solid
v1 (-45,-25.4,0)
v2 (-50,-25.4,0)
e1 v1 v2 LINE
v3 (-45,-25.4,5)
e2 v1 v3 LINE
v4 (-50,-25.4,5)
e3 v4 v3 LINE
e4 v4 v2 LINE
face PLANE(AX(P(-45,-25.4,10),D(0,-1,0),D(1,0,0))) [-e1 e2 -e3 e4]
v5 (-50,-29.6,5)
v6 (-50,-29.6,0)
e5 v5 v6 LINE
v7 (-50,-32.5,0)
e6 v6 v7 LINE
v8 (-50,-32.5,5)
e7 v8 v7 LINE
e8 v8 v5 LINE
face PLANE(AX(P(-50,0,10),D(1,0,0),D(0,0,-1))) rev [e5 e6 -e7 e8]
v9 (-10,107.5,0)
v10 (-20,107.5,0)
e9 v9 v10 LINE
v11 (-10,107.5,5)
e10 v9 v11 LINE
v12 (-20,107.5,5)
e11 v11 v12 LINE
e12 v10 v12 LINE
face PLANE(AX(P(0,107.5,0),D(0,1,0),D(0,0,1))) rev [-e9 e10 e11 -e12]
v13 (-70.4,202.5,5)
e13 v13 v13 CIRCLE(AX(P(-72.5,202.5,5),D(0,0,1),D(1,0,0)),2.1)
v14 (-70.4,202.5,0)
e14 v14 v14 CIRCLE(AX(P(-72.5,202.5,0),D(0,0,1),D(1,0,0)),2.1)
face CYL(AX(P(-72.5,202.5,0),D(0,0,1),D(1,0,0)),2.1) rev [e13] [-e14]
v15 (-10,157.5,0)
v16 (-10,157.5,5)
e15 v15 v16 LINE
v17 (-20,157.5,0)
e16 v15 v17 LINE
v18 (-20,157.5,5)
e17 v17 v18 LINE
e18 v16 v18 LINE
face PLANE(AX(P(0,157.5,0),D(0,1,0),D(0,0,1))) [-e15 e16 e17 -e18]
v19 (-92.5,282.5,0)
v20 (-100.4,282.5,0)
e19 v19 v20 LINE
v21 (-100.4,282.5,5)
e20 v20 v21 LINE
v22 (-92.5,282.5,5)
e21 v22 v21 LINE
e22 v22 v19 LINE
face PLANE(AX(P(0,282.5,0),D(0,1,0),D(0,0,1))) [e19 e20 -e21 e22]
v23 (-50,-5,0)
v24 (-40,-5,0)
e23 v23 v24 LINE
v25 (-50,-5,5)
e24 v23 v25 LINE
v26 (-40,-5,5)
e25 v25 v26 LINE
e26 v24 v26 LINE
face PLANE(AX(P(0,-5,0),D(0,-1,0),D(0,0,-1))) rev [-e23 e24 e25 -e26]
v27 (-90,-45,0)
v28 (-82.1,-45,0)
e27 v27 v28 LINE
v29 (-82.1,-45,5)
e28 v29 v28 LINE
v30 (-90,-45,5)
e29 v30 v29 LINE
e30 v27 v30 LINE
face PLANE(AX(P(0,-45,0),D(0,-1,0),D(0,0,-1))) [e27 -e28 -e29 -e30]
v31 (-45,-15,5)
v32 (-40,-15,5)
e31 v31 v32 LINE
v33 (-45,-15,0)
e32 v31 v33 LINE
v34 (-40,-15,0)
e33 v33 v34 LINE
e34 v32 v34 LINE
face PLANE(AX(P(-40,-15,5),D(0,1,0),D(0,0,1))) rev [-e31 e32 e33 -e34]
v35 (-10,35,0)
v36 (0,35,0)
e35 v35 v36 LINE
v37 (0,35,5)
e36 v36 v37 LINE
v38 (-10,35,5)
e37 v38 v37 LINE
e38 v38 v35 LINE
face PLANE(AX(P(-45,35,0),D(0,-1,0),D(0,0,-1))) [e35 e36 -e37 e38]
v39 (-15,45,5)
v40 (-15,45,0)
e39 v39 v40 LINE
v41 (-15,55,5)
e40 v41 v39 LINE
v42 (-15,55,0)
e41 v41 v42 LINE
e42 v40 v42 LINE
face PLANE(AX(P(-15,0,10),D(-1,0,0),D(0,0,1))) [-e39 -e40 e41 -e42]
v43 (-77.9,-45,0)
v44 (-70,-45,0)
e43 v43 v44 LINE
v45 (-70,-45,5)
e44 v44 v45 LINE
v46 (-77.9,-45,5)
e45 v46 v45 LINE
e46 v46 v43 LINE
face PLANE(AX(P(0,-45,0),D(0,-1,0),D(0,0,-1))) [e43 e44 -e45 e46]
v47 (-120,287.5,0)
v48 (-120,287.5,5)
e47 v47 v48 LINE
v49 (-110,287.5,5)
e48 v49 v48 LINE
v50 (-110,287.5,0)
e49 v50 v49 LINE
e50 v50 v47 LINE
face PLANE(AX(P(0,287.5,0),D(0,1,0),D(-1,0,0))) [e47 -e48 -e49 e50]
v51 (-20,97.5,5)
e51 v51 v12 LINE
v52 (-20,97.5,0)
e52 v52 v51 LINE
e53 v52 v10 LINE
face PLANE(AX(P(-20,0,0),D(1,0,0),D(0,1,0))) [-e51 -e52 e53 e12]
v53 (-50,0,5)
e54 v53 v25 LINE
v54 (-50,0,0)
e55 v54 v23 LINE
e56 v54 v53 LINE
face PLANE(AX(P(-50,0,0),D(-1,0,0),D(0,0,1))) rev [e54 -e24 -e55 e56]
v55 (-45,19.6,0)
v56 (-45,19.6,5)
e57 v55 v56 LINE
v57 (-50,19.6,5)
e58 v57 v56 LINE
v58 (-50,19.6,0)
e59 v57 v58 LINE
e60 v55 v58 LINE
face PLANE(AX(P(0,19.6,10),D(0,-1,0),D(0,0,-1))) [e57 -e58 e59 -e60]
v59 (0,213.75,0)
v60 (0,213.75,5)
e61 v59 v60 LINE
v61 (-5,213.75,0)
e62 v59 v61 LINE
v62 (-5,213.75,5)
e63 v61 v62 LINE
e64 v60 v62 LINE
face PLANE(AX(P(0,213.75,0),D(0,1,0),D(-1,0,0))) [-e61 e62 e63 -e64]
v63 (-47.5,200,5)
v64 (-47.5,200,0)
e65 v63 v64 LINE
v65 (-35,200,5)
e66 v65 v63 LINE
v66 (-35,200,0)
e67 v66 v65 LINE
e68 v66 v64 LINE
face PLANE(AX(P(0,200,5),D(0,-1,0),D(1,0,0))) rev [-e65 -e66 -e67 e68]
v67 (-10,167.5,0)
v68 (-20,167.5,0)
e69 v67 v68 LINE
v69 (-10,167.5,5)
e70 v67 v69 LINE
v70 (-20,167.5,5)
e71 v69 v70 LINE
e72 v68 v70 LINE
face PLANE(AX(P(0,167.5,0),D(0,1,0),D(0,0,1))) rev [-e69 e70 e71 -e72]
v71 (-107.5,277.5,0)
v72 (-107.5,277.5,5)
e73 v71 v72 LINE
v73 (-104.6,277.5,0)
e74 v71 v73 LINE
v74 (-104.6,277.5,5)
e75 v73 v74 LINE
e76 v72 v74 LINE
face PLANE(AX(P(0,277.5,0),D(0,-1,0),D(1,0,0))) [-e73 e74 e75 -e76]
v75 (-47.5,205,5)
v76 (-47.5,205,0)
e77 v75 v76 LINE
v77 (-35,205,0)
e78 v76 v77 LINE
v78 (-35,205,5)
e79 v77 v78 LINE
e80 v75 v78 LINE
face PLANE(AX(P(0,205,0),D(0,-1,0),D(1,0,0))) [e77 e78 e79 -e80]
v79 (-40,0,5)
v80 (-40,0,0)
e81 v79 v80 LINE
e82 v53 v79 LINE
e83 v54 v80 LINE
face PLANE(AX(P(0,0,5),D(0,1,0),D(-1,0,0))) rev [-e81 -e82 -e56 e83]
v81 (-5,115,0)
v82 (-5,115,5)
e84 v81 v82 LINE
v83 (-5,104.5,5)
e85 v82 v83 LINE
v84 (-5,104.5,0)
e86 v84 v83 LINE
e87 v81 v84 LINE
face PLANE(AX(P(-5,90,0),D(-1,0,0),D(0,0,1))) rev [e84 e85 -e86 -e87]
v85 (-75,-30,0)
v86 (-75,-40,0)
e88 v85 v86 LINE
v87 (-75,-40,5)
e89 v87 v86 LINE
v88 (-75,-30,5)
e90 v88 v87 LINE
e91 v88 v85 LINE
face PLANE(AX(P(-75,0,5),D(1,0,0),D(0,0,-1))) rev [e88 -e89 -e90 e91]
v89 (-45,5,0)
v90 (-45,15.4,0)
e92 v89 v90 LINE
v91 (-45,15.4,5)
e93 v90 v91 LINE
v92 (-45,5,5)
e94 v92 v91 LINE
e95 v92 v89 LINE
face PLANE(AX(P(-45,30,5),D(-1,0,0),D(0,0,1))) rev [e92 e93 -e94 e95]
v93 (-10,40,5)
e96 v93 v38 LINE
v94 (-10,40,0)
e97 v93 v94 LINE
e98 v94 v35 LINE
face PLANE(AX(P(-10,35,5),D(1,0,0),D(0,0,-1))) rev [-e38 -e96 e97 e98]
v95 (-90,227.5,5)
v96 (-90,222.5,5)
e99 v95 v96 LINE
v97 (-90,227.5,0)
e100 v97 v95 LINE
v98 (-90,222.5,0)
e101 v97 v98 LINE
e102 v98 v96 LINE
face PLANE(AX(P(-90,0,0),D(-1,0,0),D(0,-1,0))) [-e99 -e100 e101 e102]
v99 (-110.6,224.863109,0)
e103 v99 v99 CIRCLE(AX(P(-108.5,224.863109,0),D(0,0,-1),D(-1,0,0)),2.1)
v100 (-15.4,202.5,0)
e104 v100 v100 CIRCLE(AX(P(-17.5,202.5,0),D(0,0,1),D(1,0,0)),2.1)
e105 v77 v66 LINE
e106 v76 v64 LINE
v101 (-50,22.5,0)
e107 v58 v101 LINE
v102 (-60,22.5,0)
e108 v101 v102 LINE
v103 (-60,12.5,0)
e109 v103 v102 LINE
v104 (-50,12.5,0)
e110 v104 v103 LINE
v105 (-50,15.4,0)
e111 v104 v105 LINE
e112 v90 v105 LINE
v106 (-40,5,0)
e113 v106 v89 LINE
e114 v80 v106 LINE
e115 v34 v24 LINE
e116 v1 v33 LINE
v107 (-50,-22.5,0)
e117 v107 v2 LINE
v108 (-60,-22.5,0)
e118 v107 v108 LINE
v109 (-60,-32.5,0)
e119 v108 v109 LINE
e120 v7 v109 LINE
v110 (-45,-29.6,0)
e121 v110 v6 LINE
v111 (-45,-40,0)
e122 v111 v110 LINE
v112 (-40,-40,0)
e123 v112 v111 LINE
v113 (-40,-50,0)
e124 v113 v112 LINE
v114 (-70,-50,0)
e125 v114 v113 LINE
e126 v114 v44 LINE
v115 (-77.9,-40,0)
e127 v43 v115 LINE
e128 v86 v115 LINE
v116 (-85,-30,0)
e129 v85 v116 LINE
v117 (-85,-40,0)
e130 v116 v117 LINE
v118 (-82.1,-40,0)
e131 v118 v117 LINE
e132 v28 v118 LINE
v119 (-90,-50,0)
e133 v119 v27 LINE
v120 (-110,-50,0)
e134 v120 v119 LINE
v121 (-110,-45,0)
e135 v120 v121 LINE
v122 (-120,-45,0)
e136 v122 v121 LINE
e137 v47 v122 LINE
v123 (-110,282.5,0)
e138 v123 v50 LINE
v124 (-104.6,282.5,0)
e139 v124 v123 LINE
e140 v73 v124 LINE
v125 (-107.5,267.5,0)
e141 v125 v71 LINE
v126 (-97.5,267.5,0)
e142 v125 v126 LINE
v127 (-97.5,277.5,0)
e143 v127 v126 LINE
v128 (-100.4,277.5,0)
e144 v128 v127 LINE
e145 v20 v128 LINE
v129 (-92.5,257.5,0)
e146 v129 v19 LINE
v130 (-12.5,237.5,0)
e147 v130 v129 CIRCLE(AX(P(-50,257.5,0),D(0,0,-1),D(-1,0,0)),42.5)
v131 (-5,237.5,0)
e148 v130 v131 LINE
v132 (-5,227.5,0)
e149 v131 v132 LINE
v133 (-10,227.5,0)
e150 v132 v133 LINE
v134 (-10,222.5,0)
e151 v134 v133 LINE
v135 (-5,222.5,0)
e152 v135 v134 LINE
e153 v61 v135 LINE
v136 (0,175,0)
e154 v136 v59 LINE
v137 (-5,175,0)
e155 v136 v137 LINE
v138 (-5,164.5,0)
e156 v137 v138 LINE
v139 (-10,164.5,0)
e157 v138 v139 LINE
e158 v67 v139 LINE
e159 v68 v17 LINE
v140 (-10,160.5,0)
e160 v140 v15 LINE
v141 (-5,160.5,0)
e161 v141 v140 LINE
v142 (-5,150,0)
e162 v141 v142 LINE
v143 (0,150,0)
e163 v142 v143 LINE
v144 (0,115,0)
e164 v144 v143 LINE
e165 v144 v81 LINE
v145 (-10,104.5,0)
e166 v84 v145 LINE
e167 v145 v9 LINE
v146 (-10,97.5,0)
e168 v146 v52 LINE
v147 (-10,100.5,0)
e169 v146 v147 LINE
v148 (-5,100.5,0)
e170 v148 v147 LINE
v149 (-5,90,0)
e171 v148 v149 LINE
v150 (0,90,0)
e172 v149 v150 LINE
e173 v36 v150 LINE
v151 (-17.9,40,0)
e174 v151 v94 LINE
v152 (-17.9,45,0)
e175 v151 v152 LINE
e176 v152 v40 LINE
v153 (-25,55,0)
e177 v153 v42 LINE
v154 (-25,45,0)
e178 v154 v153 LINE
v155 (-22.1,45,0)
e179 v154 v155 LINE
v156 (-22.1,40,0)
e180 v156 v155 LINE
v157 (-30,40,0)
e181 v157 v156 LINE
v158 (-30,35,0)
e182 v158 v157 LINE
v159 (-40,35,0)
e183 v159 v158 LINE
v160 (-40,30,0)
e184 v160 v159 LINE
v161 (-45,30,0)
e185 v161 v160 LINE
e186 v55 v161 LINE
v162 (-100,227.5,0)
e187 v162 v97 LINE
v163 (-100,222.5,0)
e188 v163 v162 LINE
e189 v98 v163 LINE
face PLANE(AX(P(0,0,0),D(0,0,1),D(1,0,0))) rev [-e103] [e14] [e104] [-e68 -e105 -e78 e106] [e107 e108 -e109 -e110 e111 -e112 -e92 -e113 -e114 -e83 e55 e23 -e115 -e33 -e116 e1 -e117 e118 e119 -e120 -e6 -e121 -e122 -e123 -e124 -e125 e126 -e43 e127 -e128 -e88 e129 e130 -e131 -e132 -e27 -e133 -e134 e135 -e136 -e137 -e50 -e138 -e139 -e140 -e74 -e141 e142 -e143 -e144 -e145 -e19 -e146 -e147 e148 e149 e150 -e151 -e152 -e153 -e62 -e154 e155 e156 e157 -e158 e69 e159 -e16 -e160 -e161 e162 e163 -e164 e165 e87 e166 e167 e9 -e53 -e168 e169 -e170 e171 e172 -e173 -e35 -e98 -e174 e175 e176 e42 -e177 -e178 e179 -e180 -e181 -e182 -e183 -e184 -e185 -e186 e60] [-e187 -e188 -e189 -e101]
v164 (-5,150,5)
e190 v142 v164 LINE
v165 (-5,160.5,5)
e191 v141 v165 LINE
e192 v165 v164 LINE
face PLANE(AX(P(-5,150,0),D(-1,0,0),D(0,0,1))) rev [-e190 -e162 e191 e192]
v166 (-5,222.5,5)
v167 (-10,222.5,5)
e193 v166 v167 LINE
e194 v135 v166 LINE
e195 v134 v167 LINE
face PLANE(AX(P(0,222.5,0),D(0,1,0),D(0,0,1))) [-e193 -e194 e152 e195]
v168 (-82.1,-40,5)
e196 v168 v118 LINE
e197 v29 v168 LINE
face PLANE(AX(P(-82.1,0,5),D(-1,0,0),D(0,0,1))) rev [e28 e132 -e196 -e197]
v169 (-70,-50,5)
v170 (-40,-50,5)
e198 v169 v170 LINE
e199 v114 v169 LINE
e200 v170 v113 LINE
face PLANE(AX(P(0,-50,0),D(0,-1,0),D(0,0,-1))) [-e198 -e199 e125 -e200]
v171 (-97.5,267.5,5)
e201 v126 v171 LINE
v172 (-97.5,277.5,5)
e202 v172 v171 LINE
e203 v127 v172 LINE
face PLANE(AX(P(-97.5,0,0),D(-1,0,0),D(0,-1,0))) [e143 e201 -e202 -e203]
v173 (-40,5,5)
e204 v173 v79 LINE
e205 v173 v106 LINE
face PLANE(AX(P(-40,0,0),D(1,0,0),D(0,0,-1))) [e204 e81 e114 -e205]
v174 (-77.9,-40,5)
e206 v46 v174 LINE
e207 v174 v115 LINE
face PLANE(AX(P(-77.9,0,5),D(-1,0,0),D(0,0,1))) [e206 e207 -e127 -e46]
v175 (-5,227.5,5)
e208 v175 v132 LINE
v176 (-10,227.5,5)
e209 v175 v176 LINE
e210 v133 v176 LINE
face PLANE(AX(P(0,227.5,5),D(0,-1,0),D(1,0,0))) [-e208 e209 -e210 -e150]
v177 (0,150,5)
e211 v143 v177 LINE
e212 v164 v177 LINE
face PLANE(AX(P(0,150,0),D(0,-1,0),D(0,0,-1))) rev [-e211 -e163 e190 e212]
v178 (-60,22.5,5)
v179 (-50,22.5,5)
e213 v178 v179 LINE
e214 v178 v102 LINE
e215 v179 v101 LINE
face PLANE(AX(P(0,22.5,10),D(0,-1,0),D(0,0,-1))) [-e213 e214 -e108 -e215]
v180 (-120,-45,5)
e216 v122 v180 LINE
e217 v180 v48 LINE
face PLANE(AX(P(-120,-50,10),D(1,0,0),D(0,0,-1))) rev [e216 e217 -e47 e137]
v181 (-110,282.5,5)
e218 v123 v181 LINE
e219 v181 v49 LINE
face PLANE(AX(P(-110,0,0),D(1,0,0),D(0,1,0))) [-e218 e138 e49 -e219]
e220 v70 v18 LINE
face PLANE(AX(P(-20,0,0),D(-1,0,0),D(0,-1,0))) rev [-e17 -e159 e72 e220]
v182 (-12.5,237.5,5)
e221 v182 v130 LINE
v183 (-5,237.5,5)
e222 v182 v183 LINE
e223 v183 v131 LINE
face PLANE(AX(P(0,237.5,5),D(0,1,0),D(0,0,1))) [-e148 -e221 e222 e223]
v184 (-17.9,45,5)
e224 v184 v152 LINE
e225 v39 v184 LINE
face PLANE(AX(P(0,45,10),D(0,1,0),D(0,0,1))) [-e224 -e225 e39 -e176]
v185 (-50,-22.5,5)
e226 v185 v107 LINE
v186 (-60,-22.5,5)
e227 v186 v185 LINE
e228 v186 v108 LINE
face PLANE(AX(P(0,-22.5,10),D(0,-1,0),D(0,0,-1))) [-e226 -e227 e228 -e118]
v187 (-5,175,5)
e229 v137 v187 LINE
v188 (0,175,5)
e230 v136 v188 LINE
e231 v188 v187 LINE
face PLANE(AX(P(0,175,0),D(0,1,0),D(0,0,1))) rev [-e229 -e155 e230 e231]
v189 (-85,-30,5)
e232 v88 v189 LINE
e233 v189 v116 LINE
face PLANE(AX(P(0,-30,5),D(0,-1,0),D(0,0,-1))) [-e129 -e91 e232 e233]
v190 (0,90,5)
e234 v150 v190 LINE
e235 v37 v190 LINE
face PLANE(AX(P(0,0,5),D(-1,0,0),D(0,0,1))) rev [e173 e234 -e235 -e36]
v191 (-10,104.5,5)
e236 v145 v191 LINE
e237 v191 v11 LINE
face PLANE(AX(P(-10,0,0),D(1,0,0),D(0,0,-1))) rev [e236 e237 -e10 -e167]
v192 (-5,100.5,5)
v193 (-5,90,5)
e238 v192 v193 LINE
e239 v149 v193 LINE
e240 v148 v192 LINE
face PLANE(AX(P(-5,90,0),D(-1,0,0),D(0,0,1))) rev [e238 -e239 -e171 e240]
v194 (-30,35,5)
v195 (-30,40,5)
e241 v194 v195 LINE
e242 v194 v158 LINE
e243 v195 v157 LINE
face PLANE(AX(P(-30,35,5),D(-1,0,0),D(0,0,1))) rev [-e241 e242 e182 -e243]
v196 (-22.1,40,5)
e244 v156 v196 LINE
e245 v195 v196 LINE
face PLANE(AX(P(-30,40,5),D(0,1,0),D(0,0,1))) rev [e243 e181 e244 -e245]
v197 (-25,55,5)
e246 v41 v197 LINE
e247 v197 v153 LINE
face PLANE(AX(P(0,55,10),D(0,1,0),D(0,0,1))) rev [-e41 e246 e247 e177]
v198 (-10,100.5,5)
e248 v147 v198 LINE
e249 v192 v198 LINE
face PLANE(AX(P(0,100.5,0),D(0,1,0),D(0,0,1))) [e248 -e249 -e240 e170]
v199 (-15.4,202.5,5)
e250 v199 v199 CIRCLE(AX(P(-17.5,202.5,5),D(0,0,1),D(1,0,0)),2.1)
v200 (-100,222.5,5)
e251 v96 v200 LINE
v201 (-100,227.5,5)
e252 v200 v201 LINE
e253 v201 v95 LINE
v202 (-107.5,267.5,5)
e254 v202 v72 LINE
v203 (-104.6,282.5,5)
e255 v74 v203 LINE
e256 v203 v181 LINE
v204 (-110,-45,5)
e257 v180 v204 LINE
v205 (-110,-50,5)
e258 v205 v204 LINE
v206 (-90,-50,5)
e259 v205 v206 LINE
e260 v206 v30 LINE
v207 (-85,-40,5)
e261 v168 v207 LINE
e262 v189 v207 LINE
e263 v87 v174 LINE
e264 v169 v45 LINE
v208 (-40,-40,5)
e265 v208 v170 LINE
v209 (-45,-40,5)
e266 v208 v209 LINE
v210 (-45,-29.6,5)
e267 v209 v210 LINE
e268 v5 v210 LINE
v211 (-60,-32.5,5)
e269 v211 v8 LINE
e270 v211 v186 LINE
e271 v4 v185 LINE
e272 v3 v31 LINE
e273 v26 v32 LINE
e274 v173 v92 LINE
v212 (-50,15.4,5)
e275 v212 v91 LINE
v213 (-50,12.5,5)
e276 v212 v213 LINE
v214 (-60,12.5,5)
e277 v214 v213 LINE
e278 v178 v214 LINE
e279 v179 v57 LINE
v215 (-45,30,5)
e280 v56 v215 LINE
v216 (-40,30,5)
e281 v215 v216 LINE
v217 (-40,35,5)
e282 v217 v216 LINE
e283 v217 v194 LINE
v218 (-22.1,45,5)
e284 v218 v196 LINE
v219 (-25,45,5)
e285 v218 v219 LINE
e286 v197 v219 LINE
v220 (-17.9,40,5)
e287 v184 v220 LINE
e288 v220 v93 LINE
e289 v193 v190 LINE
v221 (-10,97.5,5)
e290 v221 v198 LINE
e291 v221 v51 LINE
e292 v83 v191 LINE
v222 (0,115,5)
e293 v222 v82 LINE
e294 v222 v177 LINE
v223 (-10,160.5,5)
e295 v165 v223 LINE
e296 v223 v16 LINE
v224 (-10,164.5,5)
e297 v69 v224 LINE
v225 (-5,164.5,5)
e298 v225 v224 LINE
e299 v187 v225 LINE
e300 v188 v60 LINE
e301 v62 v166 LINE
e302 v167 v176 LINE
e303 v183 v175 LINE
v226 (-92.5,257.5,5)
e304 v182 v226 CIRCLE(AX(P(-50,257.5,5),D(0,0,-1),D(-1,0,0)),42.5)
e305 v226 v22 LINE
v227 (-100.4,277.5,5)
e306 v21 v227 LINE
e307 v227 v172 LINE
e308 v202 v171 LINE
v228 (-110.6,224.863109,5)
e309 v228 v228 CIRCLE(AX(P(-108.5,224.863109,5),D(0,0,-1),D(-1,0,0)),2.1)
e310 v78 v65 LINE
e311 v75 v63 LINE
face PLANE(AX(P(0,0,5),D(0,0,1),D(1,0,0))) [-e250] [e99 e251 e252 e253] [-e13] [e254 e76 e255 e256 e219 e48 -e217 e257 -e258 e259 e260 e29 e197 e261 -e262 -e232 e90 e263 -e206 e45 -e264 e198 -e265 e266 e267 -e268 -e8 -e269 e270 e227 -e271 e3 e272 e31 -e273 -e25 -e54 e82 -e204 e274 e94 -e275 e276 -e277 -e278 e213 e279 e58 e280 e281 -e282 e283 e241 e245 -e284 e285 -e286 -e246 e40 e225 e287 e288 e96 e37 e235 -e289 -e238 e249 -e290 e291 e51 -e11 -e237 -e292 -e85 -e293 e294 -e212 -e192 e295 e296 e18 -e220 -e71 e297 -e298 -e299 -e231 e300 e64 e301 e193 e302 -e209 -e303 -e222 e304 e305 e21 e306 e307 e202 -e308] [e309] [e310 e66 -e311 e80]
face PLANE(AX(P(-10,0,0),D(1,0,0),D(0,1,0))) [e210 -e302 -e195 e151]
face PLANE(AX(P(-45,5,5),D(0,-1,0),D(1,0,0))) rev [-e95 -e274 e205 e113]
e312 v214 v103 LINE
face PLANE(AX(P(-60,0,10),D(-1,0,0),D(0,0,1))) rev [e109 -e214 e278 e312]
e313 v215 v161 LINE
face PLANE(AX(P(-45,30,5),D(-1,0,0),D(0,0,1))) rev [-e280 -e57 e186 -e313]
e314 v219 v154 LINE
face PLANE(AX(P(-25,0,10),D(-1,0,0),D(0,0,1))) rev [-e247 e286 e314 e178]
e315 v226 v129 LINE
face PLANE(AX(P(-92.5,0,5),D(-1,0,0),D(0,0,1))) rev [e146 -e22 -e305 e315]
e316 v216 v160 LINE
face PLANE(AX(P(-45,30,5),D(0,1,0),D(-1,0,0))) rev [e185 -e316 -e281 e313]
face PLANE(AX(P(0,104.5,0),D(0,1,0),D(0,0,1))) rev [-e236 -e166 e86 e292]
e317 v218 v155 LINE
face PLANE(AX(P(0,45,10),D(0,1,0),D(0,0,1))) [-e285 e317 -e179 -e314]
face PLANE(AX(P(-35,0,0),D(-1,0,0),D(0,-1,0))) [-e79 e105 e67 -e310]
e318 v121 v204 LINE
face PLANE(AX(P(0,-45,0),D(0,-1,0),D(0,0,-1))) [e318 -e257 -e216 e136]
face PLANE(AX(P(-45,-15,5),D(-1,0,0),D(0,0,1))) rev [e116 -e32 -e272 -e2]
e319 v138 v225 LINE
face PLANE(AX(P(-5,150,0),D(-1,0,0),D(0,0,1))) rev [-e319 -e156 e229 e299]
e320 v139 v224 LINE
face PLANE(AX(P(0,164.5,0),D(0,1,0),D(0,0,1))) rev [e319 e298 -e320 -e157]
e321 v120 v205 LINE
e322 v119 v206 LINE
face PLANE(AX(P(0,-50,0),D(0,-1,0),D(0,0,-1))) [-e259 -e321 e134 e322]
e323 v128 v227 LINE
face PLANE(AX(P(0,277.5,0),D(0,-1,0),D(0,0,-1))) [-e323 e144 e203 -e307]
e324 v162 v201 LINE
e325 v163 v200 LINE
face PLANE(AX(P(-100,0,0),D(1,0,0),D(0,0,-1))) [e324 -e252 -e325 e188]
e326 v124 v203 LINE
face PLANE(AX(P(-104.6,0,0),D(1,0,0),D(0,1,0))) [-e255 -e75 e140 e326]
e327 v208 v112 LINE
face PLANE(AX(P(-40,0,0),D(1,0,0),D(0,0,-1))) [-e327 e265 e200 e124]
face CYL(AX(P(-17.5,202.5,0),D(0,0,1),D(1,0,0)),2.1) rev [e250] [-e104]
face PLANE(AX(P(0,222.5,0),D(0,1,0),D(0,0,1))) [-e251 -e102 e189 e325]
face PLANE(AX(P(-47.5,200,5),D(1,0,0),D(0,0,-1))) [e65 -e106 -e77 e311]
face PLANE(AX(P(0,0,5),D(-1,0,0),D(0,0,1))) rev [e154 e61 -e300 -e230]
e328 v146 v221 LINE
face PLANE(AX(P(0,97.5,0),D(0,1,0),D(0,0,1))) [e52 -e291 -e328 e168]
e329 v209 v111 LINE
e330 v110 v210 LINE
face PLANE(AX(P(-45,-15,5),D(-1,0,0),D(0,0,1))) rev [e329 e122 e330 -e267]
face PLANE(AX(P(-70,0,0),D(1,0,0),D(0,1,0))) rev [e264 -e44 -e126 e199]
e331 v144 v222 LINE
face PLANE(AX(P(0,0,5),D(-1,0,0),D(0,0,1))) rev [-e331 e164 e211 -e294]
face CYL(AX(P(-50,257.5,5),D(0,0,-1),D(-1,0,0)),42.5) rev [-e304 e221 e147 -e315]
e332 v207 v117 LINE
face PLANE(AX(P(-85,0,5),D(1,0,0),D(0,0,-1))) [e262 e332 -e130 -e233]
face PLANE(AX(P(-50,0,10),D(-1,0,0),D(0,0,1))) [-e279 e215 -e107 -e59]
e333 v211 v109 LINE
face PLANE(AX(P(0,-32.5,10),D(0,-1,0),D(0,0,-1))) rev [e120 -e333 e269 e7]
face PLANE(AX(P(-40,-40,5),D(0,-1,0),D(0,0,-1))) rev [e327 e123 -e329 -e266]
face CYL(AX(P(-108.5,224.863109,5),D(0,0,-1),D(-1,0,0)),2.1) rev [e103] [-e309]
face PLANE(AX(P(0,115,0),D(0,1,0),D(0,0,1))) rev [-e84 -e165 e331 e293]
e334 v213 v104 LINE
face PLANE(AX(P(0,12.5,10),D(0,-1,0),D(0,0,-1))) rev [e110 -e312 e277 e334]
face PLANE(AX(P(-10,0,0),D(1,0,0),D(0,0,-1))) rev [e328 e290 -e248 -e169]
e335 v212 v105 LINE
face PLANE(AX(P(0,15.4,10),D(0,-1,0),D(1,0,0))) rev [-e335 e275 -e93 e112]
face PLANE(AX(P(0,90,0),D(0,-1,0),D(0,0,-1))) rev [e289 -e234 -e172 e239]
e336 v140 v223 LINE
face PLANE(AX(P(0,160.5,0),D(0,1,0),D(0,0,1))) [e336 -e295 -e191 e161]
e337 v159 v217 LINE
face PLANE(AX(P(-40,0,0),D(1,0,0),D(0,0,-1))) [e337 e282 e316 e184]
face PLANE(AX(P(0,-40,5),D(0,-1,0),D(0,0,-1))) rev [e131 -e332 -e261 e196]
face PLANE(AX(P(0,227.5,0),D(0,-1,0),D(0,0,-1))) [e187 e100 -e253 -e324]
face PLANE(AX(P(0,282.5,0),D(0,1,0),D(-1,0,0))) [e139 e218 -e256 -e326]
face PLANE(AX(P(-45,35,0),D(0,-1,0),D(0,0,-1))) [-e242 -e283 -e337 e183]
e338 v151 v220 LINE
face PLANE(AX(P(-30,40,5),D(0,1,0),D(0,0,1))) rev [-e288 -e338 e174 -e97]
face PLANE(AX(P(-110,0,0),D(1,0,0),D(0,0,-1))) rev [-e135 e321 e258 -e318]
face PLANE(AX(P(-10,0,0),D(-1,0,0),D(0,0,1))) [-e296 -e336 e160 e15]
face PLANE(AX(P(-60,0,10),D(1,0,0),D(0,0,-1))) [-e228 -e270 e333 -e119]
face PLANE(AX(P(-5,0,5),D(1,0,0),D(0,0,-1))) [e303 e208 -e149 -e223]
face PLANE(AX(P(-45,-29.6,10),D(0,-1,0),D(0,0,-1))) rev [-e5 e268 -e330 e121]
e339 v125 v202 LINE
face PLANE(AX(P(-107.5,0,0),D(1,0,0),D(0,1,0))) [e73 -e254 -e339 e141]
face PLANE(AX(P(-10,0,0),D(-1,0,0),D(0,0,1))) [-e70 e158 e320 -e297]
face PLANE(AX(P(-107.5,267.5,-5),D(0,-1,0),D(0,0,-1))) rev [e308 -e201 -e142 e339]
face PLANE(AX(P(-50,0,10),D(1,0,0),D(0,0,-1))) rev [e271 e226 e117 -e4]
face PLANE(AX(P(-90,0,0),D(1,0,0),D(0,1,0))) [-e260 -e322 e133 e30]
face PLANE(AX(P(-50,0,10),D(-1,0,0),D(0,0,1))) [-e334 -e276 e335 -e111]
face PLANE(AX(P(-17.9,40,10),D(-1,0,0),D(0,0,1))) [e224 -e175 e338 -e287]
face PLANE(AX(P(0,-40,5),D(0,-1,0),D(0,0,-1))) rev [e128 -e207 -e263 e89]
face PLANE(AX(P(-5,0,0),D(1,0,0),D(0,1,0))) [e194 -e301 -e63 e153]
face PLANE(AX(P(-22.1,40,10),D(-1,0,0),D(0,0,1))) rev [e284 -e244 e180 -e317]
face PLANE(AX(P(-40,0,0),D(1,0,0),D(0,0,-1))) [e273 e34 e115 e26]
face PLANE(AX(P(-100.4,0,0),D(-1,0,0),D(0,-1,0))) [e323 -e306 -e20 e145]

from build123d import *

# Parameters (mm, degrees)
SKETCH1_W               = 150
SKETCH1_H               = 200
BOSS_EXTRUDE1_DEPTH     = 5
SKETCH2_W               = 45
SKETCH2_H               = 50
CUT_EXTRUDE1_DEPTH      = 10
SKETCH3_W               = 35
SKETCH3_H               = 5
BOSS_EXTRUDE2_DEPTH     = 5
SKETCH5_W               = 5
SKETCH5_H               = 45
BOSS_EXTRUDE3_DEPTH     = 5
SKETCH6_W               = 45
SKETCH6_H               = 15
BOSS_EXTRUDE4_DEPTH     = 5
SKETCH7_W               = 5
SKETCH7_H               = 25
SKETCH7_H_2             = 50
BOSS_EXTRUDE5_DEPTH     = 5
SKETCH8_W               = 35
SKETCH8_H               = 250
CUT_EXTRUDE3_DEPTH      = 10
SKETCH9_R               = 2.1
CUT_EXTRUDE4_DEPTH      = 5
BOSS_EXTRUDE6_DEPTH     = 5
CUT_EXTRUDE5_DEPTH      = 5
SKETCH12_W              = 4.2
SKETCH12_H              = 5
CUT_EXTRUDE6_DEPTH      = 5
SKETCH13_W              = 5
SKETCH13_H              = 35
SKETCH13_H_2            = 45
BOSS_EXTRUDE7_DEPTH     = 5
SKETCH14_W              = 5
SKETCH14_H              = 25
CUT_EXTRUDE7_DEPTH      = 5
SKETCH15_W              = 20
SKETCH15_H              = 5
CUT_EXTRUDE8_DEPTH      = 5
SKETCH16_W              = 5
SKETCH16_H              = 25
CUT_EXTRUDE9_DEPTH      = 5
BOSS_EXTRUDE8_START     = -5
BOSS_EXTRUDE8_OUTLINE_R = 2.1
BOSS_EXTRUDE8_OUTLINE_W = 10
BOSS_EXTRUDE8_OUTLINE_H = 5
BOSS_EXTRUDE8_DEPTH     = 5
SKETCH18_W              = 10
SKETCH18_H              = 10
SKETCH18_W_2            = 5
SKETCH18_H_2            = 4
CUT_EXTRUDE10_DEPTH     = 5
CUT_EXTRUDE11_DEPTH     = 10
SKETCH20_W              = 10
SKETCH20_H              = 1.8
CUT_EXTRUDE13_DEPTH     = 10
SKETCH21_R              = 42.5
SKETCH21_R_2            = 3
CUT_EXTRUDE14_DEPTH     = 5
BOSS_EXTRUDE9_DEPTH     = 5
BOSS_EXTRUDE10_DEPTH    = 5
SKETCH24_R              = 2.1
BOSS_EXTRUDE11_DEPTH    = 5
SKETCH25_R              = 2.1
CUT_EXTRUDE15_DEPTH     = 5


# Read off the part's stored shape, not the designer's step: Boss-Extrude8
with BuildPart() as part:
    # Sketch1 → Boss-Extrude1 (new body)
    with BuildSketch(Plane.XY):
        with Locations((-75, 100)):
            Rectangle(SKETCH1_W, SKETCH1_H)
    extrude(amount=BOSS_EXTRUDE1_DEPTH)

    # Sketch2 → Cut-Extrude1 (cut)
    with BuildSketch(Plane.XY.offset(5)):
        with Locations((-22.5, 25)):
            Rectangle(SKETCH2_W, SKETCH2_H)
    extrude(amount=-CUT_EXTRUDE1_DEPTH, mode=Mode.SUBTRACT)

    # Sketch3 → Boss-Extrude2 (add)
    with BuildSketch(Plane(origin=(0, 0, 0), x_dir=(-1, 0, 0), z_dir=(0, 0, -1))):
        with Locations((65, 202.5)):
            Rectangle(SKETCH3_W, SKETCH3_H)
    extrude(amount=-BOSS_EXTRUDE2_DEPTH)

    # Sketch5 → Boss-Extrude3 (add)
    with BuildSketch(Plane.XY.offset(5)):
        Polygon((-50, 0), (-150, 0), (-150, -50), (-130, -50), (-130, -45), (-110, -45), (-110, -50), (-90, -50), (-90, -45), (-70, -45), (-70, -50), (-50, -50), (-50, -5), align=None)
        with Locations((-47.5, -27.5)):
            Rectangle(SKETCH5_W, SKETCH5_H)
    extrude(amount=-BOSS_EXTRUDE3_DEPTH)

    # Sketch6 → Boss-Extrude4 (add)
    with BuildSketch(Plane.XY.offset(5)):
        with Locations((-22.5, 42.5)):
            Rectangle(SKETCH6_W, SKETCH6_H)
    extrude(amount=-BOSS_EXTRUDE4_DEPTH)

    # Sketch7 → Boss-Extrude5 (add)
    with BuildSketch(Plane(origin=(0, 0, 0), x_dir=(-1, 0, 0), z_dir=(0, 0, -1))):
        with Locations((152.5, 27.5)):
            Rectangle(SKETCH7_W, SKETCH7_H)
        with Locations((152.5, 130)):
            Rectangle(SKETCH7_W, SKETCH7_H_2)
    extrude(amount=-BOSS_EXTRUDE5_DEPTH)

    # Sketch8 → Cut-Extrude3 (cut)
    with BuildSketch(Plane(origin=(0, 0, 0), x_dir=(-1, 0, 0), z_dir=(0, 0, -1))):
        with Locations((137.5, 75)):
            Rectangle(SKETCH8_W, SKETCH8_H)
    extrude(amount=-CUT_EXTRUDE3_DEPTH, mode=Mode.SUBTRACT)

    # Sketch9 → Cut-Extrude4 (cut)
    with BuildSketch(Plane.XY.offset(5)):
        with Locations((-72.5, 202.5)):
            Circle(SKETCH9_R)
    extrude(amount=-CUT_EXTRUDE4_DEPTH, mode=Mode.SUBTRACT)

    # Sketch10 → Boss-Extrude6 (add)
    with BuildSketch(Plane.XY.offset(5)):
        with BuildLine():
            Line((-76.830127019, 205), (-68.169872981, 205))
            ThreePointArc((-68.169872981, 205), (-72.5, 207.5), (-76.830127019, 205))
        make_face()
    extrude(amount=-BOSS_EXTRUDE6_DEPTH)

    # Sketch11 → Cut-Extrude5 (cut)
    with BuildSketch(Plane(origin=(0, 0, 0), x_dir=(-1, 0, 0), z_dir=(0, 0, -1))):
        with BuildLine():
            Line((21.830127019, 200), (13.169872981, 200))
            ThreePointArc((13.169872981, 200), (17.5, 197.5), (21.830127019, 200))
        make_face()
    extrude(amount=-CUT_EXTRUDE5_DEPTH, mode=Mode.SUBTRACT)

    # Sketch12 → Cut-Extrude6 (cut)
    with BuildSketch(Plane(origin=(0, 0, 0), x_dir=(-1, 0, 0), z_dir=(0, 0, -1))):
        Polygon((75, -40), (77.9, -40), (82.1, -40), (85, -40), (85, -30), (75, -30), align=None)
        with Locations((80, -42.5)):
            Rectangle(SKETCH12_W, SKETCH12_H)
    extrude(amount=-CUT_EXTRUDE6_DEPTH, mode=Mode.SUBTRACT)

    # Sketch13 → Boss-Extrude7 (add)
    with BuildSketch(Plane(origin=(-45, 0, 0), x_dir=(0, 0, -1), z_dir=(1, 0, 0))):
        with Locations((-2.5, 17.5)):
            Rectangle(SKETCH13_W, SKETCH13_H)
        with Locations((-2.5, -27.5)):
            Rectangle(SKETCH13_W, SKETCH13_H_2)
    extrude(amount=BOSS_EXTRUDE7_DEPTH)

    # Sketch14 → Cut-Extrude7 (cut)
    with BuildSketch(Plane(origin=(0, 0, 0), x_dir=(-1, 0, 0), z_dir=(0, 0, -1))):
        with Locations((42.5, -27.5)):
            Rectangle(SKETCH14_W, SKETCH14_H)
        with Locations((42.5, 17.5)):
            Rectangle(SKETCH14_W, SKETCH14_H)
    extrude(amount=-CUT_EXTRUDE7_DEPTH, mode=Mode.SUBTRACT)

    # Sketch15 → Cut-Extrude8 (cut)
    with BuildSketch(Plane(origin=(0, 0, 0), x_dir=(-1, 0, 0), z_dir=(0, 0, -1))):
        with Locations((20, 37.5)):
            Rectangle(SKETCH15_W, SKETCH15_H)
    extrude(amount=-CUT_EXTRUDE8_DEPTH, mode=Mode.SUBTRACT)

    # Sketch16 → Cut-Extrude9 (cut)
    with BuildSketch(Plane.XY.offset(5)):
        with Locations((-2.5, 102.5)):
            Rectangle(SKETCH16_W, SKETCH16_H)
        with Locations((-2.5, 162.5)):
            Rectangle(SKETCH16_W, SKETCH16_H)
    extrude(amount=-CUT_EXTRUDE9_DEPTH, mode=Mode.SUBTRACT)

    # Boss-Extrude8 outline → Boss-Extrude8 (add)
    with BuildSketch(Plane.XY.offset(5).offset(BOSS_EXTRUDE8_START)):
        with BuildLine():
            Line((0, 200), (0, 213.75))
            Line((0, 213.75), (-5, 213.75))
            Line((-5, 213.75), (-5, 222.5))
            Line((-5, 222.5), (-10, 222.5))
            Line((-10, 222.5), (-10, 227.5))
            Line((-10, 227.5), (-20, 227.5))
            Line((-20, 227.5), (-20, 222.5))
            Line((-20, 222.5), (-28.711001812, 222.5))
            ThreePointArc((-28.711001812, 222.5), (-66.079667431, 219.821548079), (-90, 248.65571123))
            Line((-90, 248.65571123), (-90, 282.5))
            Line((-90, 282.5), (-100.4, 282.5))
            Line((-100.4, 282.5), (-100.4, 277.5))
            Line((-100.4, 277.5), (-97.5, 277.5))
            Line((-97.5, 277.5), (-97.5, 269.3))
            Line((-97.5, 269.3), (-107.5, 269.3))
            Line((-107.5, 269.3), (-107.5, 277.5))
            Line((-107.5, 277.5), (-104.6, 277.5))
            Line((-104.6, 277.5), (-104.6, 282.5))
            Line((-104.6, 282.5), (-110, 282.5))
            Line((-110, 282.5), (-110, 287.5))
            Line((-110, 287.5), (-120, 287.5))
            Line((-120, 287.5), (-120, 200))
            Line((-120, 200), (-82.5, 200))
            Line((-82.5, 200), (-82.5, 205))
            Line((-82.5, 205), (-76.830127019, 205))
            ThreePointArc((-76.830127019, 205), (-72.5, 207.5), (-68.169872981, 205))
            Line((-68.169872981, 205), (-35, 205))
            Line((-35, 205), (-35, 200))
            Line((-35, 200), (-21.830127019, 200))
            ThreePointArc((-21.830127019, 200), (-17.5, 197.5), (-13.169872981, 200))
            Line((-13.169872981, 200), (0, 200))
        make_face()
        with Locations((-115, 225)):
            Circle(BOSS_EXTRUDE8_OUTLINE_R, mode=Mode.SUBTRACT)
        with Locations((-95, 225)):
            Rectangle(BOSS_EXTRUDE8_OUTLINE_W, BOSS_EXTRUDE8_OUTLINE_H, mode=Mode.SUBTRACT)
        with Locations((-17.5, 202.5)):
            Circle(BOSS_EXTRUDE8_OUTLINE_R, mode=Mode.SUBTRACT)
    extrude(amount=BOSS_EXTRUDE8_DEPTH)

    # Sketch18 → Cut-Extrude10 (cut)
    with BuildSketch(Plane.XY.offset(5)):
        with Locations((-15, 162.5)):
            Rectangle(SKETCH18_W, SKETCH18_H)
        with Locations((-7.5, 162.5)):
            Rectangle(SKETCH18_W_2, SKETCH18_H_2)
        with Locations((-7.5, 102.5)):
            Rectangle(SKETCH18_W_2, SKETCH18_H_2)
        Polygon((-10, 100.5), (-10, 104.5), (-10, 107.5), (-20, 107.5), (-20, 97.5), (-10, 97.5), align=None)
    extrude(amount=-CUT_EXTRUDE10_DEPTH, mode=Mode.SUBTRACT)

    # Sketch19 → Cut-Extrude11 (cut)
    with BuildSketch(Plane(origin=(0, 0, 0), x_dir=(-1, 0, 0), z_dir=(0, 0, -1))):
        Polygon((45, -25.4), (45, -29.6), (50, -29.6), (50, -32.5), (60, -32.5), (60, -22.5), (50, -22.5), (50, -25.4), align=None)
        Polygon((50, 12.5), (60, 12.5), (60, 22.5), (50, 22.5), (50, 19.6), (45, 19.6), (45, 15.4), (50, 15.4), align=None)
        Polygon((17.9, 40), (22.1, 40), (22.1, 45), (25, 45), (25, 55), (15, 55), (15, 45), (17.9, 45), align=None)
    extrude(amount=-CUT_EXTRUDE11_DEPTH, mode=Mode.SUBTRACT)

    # Sketch20 → Cut-Extrude13 (cut)
    with BuildSketch(Plane.XY.offset(5)):
        with Locations((-102.5, 268.4)):
            Rectangle(SKETCH20_W, SKETCH20_H)
    extrude(amount=-CUT_EXTRUDE13_DEPTH, mode=Mode.SUBTRACT)

    # Sketch21 → Cut-Extrude14 (cut)
    # profile 1 of 2: a face of its own
    with BuildSketch(Plane(origin=(0, 0, 0), x_dir=(-1, 0, 0), z_dir=(0, 0, -1))):
        with BuildLine():
            ThreePointArc((84.369317712, 282.5), (90.41624675, 270.644466464), (92.5, 257.5))
            Line((92.5, 257.5), (92.5, 282.5))
            Line((92.5, 282.5), (84.369317712, 282.5))
        make_face()
    # profile 2 of 2: a face of its own
    with BuildSketch(Plane(origin=(0, 0, 0), x_dir=(-1, 0, 0), z_dir=(0, 0, -1))):
        with Locations((50, 257.5)):
            Circle(SKETCH21_R)
        with Locations((50, 257.5)):
            Circle(SKETCH21_R_2, mode=Mode.SUBTRACT)
    extrude(amount=-CUT_EXTRUDE14_DEPTH, mode=Mode.SUBTRACT)

    # Sketch22 → Boss-Extrude9 (add)
    with BuildSketch(Plane(origin=(0, 0, 0), x_dir=(-1, 0, 0), z_dir=(0, 0, -1))):
        with BuildLine():
            Line((20, 222.5), (20, 227.396013553))
            ThreePointArc((20, 227.396013553), (22.834909521, 224.815020892), (25.890873098, 222.5))
            Line((25.890873098, 222.5), (20, 222.5))
        make_face()
    extrude(amount=-BOSS_EXTRUDE9_DEPTH)

    # Sketch23 → Boss-Extrude10 (add)
    with BuildSketch(Plane(origin=(0, 0, 0), x_dir=(-1, 0, 0), z_dir=(0, 0, -1))):
        with BuildLine():
            ThreePointArc((19.896013553, 227.5), (15.830207114, 232.227974871), (12.5, 237.5))
            Line((12.5, 237.5), (5, 237.5))
            Line((5, 237.5), (5, 227.5))
            Line((5, 227.5), (19.896013553, 227.5))
        make_face()
    extrude(amount=-BOSS_EXTRUDE10_DEPTH)

    # Sketch24 → Boss-Extrude11 (add)
    with BuildSketch(Plane(origin=(0, 0, 0), x_dir=(-1, 0, 0), z_dir=(0, 0, -1))):
        with Locations((115, 225)):
            Circle(SKETCH24_R)
    extrude(amount=-BOSS_EXTRUDE11_DEPTH)

    # Sketch25 → Cut-Extrude15 (cut)
    with BuildSketch(Plane(origin=(0, 0, 0), x_dir=(-1, 0, 0), z_dir=(0, 0, -1))):
        with Locations((108.5, 224.863108965)):
            Circle(SKETCH25_R)
    extrude(amount=-CUT_EXTRUDE15_DEPTH, mode=Mode.SUBTRACT)


solid = part.part
